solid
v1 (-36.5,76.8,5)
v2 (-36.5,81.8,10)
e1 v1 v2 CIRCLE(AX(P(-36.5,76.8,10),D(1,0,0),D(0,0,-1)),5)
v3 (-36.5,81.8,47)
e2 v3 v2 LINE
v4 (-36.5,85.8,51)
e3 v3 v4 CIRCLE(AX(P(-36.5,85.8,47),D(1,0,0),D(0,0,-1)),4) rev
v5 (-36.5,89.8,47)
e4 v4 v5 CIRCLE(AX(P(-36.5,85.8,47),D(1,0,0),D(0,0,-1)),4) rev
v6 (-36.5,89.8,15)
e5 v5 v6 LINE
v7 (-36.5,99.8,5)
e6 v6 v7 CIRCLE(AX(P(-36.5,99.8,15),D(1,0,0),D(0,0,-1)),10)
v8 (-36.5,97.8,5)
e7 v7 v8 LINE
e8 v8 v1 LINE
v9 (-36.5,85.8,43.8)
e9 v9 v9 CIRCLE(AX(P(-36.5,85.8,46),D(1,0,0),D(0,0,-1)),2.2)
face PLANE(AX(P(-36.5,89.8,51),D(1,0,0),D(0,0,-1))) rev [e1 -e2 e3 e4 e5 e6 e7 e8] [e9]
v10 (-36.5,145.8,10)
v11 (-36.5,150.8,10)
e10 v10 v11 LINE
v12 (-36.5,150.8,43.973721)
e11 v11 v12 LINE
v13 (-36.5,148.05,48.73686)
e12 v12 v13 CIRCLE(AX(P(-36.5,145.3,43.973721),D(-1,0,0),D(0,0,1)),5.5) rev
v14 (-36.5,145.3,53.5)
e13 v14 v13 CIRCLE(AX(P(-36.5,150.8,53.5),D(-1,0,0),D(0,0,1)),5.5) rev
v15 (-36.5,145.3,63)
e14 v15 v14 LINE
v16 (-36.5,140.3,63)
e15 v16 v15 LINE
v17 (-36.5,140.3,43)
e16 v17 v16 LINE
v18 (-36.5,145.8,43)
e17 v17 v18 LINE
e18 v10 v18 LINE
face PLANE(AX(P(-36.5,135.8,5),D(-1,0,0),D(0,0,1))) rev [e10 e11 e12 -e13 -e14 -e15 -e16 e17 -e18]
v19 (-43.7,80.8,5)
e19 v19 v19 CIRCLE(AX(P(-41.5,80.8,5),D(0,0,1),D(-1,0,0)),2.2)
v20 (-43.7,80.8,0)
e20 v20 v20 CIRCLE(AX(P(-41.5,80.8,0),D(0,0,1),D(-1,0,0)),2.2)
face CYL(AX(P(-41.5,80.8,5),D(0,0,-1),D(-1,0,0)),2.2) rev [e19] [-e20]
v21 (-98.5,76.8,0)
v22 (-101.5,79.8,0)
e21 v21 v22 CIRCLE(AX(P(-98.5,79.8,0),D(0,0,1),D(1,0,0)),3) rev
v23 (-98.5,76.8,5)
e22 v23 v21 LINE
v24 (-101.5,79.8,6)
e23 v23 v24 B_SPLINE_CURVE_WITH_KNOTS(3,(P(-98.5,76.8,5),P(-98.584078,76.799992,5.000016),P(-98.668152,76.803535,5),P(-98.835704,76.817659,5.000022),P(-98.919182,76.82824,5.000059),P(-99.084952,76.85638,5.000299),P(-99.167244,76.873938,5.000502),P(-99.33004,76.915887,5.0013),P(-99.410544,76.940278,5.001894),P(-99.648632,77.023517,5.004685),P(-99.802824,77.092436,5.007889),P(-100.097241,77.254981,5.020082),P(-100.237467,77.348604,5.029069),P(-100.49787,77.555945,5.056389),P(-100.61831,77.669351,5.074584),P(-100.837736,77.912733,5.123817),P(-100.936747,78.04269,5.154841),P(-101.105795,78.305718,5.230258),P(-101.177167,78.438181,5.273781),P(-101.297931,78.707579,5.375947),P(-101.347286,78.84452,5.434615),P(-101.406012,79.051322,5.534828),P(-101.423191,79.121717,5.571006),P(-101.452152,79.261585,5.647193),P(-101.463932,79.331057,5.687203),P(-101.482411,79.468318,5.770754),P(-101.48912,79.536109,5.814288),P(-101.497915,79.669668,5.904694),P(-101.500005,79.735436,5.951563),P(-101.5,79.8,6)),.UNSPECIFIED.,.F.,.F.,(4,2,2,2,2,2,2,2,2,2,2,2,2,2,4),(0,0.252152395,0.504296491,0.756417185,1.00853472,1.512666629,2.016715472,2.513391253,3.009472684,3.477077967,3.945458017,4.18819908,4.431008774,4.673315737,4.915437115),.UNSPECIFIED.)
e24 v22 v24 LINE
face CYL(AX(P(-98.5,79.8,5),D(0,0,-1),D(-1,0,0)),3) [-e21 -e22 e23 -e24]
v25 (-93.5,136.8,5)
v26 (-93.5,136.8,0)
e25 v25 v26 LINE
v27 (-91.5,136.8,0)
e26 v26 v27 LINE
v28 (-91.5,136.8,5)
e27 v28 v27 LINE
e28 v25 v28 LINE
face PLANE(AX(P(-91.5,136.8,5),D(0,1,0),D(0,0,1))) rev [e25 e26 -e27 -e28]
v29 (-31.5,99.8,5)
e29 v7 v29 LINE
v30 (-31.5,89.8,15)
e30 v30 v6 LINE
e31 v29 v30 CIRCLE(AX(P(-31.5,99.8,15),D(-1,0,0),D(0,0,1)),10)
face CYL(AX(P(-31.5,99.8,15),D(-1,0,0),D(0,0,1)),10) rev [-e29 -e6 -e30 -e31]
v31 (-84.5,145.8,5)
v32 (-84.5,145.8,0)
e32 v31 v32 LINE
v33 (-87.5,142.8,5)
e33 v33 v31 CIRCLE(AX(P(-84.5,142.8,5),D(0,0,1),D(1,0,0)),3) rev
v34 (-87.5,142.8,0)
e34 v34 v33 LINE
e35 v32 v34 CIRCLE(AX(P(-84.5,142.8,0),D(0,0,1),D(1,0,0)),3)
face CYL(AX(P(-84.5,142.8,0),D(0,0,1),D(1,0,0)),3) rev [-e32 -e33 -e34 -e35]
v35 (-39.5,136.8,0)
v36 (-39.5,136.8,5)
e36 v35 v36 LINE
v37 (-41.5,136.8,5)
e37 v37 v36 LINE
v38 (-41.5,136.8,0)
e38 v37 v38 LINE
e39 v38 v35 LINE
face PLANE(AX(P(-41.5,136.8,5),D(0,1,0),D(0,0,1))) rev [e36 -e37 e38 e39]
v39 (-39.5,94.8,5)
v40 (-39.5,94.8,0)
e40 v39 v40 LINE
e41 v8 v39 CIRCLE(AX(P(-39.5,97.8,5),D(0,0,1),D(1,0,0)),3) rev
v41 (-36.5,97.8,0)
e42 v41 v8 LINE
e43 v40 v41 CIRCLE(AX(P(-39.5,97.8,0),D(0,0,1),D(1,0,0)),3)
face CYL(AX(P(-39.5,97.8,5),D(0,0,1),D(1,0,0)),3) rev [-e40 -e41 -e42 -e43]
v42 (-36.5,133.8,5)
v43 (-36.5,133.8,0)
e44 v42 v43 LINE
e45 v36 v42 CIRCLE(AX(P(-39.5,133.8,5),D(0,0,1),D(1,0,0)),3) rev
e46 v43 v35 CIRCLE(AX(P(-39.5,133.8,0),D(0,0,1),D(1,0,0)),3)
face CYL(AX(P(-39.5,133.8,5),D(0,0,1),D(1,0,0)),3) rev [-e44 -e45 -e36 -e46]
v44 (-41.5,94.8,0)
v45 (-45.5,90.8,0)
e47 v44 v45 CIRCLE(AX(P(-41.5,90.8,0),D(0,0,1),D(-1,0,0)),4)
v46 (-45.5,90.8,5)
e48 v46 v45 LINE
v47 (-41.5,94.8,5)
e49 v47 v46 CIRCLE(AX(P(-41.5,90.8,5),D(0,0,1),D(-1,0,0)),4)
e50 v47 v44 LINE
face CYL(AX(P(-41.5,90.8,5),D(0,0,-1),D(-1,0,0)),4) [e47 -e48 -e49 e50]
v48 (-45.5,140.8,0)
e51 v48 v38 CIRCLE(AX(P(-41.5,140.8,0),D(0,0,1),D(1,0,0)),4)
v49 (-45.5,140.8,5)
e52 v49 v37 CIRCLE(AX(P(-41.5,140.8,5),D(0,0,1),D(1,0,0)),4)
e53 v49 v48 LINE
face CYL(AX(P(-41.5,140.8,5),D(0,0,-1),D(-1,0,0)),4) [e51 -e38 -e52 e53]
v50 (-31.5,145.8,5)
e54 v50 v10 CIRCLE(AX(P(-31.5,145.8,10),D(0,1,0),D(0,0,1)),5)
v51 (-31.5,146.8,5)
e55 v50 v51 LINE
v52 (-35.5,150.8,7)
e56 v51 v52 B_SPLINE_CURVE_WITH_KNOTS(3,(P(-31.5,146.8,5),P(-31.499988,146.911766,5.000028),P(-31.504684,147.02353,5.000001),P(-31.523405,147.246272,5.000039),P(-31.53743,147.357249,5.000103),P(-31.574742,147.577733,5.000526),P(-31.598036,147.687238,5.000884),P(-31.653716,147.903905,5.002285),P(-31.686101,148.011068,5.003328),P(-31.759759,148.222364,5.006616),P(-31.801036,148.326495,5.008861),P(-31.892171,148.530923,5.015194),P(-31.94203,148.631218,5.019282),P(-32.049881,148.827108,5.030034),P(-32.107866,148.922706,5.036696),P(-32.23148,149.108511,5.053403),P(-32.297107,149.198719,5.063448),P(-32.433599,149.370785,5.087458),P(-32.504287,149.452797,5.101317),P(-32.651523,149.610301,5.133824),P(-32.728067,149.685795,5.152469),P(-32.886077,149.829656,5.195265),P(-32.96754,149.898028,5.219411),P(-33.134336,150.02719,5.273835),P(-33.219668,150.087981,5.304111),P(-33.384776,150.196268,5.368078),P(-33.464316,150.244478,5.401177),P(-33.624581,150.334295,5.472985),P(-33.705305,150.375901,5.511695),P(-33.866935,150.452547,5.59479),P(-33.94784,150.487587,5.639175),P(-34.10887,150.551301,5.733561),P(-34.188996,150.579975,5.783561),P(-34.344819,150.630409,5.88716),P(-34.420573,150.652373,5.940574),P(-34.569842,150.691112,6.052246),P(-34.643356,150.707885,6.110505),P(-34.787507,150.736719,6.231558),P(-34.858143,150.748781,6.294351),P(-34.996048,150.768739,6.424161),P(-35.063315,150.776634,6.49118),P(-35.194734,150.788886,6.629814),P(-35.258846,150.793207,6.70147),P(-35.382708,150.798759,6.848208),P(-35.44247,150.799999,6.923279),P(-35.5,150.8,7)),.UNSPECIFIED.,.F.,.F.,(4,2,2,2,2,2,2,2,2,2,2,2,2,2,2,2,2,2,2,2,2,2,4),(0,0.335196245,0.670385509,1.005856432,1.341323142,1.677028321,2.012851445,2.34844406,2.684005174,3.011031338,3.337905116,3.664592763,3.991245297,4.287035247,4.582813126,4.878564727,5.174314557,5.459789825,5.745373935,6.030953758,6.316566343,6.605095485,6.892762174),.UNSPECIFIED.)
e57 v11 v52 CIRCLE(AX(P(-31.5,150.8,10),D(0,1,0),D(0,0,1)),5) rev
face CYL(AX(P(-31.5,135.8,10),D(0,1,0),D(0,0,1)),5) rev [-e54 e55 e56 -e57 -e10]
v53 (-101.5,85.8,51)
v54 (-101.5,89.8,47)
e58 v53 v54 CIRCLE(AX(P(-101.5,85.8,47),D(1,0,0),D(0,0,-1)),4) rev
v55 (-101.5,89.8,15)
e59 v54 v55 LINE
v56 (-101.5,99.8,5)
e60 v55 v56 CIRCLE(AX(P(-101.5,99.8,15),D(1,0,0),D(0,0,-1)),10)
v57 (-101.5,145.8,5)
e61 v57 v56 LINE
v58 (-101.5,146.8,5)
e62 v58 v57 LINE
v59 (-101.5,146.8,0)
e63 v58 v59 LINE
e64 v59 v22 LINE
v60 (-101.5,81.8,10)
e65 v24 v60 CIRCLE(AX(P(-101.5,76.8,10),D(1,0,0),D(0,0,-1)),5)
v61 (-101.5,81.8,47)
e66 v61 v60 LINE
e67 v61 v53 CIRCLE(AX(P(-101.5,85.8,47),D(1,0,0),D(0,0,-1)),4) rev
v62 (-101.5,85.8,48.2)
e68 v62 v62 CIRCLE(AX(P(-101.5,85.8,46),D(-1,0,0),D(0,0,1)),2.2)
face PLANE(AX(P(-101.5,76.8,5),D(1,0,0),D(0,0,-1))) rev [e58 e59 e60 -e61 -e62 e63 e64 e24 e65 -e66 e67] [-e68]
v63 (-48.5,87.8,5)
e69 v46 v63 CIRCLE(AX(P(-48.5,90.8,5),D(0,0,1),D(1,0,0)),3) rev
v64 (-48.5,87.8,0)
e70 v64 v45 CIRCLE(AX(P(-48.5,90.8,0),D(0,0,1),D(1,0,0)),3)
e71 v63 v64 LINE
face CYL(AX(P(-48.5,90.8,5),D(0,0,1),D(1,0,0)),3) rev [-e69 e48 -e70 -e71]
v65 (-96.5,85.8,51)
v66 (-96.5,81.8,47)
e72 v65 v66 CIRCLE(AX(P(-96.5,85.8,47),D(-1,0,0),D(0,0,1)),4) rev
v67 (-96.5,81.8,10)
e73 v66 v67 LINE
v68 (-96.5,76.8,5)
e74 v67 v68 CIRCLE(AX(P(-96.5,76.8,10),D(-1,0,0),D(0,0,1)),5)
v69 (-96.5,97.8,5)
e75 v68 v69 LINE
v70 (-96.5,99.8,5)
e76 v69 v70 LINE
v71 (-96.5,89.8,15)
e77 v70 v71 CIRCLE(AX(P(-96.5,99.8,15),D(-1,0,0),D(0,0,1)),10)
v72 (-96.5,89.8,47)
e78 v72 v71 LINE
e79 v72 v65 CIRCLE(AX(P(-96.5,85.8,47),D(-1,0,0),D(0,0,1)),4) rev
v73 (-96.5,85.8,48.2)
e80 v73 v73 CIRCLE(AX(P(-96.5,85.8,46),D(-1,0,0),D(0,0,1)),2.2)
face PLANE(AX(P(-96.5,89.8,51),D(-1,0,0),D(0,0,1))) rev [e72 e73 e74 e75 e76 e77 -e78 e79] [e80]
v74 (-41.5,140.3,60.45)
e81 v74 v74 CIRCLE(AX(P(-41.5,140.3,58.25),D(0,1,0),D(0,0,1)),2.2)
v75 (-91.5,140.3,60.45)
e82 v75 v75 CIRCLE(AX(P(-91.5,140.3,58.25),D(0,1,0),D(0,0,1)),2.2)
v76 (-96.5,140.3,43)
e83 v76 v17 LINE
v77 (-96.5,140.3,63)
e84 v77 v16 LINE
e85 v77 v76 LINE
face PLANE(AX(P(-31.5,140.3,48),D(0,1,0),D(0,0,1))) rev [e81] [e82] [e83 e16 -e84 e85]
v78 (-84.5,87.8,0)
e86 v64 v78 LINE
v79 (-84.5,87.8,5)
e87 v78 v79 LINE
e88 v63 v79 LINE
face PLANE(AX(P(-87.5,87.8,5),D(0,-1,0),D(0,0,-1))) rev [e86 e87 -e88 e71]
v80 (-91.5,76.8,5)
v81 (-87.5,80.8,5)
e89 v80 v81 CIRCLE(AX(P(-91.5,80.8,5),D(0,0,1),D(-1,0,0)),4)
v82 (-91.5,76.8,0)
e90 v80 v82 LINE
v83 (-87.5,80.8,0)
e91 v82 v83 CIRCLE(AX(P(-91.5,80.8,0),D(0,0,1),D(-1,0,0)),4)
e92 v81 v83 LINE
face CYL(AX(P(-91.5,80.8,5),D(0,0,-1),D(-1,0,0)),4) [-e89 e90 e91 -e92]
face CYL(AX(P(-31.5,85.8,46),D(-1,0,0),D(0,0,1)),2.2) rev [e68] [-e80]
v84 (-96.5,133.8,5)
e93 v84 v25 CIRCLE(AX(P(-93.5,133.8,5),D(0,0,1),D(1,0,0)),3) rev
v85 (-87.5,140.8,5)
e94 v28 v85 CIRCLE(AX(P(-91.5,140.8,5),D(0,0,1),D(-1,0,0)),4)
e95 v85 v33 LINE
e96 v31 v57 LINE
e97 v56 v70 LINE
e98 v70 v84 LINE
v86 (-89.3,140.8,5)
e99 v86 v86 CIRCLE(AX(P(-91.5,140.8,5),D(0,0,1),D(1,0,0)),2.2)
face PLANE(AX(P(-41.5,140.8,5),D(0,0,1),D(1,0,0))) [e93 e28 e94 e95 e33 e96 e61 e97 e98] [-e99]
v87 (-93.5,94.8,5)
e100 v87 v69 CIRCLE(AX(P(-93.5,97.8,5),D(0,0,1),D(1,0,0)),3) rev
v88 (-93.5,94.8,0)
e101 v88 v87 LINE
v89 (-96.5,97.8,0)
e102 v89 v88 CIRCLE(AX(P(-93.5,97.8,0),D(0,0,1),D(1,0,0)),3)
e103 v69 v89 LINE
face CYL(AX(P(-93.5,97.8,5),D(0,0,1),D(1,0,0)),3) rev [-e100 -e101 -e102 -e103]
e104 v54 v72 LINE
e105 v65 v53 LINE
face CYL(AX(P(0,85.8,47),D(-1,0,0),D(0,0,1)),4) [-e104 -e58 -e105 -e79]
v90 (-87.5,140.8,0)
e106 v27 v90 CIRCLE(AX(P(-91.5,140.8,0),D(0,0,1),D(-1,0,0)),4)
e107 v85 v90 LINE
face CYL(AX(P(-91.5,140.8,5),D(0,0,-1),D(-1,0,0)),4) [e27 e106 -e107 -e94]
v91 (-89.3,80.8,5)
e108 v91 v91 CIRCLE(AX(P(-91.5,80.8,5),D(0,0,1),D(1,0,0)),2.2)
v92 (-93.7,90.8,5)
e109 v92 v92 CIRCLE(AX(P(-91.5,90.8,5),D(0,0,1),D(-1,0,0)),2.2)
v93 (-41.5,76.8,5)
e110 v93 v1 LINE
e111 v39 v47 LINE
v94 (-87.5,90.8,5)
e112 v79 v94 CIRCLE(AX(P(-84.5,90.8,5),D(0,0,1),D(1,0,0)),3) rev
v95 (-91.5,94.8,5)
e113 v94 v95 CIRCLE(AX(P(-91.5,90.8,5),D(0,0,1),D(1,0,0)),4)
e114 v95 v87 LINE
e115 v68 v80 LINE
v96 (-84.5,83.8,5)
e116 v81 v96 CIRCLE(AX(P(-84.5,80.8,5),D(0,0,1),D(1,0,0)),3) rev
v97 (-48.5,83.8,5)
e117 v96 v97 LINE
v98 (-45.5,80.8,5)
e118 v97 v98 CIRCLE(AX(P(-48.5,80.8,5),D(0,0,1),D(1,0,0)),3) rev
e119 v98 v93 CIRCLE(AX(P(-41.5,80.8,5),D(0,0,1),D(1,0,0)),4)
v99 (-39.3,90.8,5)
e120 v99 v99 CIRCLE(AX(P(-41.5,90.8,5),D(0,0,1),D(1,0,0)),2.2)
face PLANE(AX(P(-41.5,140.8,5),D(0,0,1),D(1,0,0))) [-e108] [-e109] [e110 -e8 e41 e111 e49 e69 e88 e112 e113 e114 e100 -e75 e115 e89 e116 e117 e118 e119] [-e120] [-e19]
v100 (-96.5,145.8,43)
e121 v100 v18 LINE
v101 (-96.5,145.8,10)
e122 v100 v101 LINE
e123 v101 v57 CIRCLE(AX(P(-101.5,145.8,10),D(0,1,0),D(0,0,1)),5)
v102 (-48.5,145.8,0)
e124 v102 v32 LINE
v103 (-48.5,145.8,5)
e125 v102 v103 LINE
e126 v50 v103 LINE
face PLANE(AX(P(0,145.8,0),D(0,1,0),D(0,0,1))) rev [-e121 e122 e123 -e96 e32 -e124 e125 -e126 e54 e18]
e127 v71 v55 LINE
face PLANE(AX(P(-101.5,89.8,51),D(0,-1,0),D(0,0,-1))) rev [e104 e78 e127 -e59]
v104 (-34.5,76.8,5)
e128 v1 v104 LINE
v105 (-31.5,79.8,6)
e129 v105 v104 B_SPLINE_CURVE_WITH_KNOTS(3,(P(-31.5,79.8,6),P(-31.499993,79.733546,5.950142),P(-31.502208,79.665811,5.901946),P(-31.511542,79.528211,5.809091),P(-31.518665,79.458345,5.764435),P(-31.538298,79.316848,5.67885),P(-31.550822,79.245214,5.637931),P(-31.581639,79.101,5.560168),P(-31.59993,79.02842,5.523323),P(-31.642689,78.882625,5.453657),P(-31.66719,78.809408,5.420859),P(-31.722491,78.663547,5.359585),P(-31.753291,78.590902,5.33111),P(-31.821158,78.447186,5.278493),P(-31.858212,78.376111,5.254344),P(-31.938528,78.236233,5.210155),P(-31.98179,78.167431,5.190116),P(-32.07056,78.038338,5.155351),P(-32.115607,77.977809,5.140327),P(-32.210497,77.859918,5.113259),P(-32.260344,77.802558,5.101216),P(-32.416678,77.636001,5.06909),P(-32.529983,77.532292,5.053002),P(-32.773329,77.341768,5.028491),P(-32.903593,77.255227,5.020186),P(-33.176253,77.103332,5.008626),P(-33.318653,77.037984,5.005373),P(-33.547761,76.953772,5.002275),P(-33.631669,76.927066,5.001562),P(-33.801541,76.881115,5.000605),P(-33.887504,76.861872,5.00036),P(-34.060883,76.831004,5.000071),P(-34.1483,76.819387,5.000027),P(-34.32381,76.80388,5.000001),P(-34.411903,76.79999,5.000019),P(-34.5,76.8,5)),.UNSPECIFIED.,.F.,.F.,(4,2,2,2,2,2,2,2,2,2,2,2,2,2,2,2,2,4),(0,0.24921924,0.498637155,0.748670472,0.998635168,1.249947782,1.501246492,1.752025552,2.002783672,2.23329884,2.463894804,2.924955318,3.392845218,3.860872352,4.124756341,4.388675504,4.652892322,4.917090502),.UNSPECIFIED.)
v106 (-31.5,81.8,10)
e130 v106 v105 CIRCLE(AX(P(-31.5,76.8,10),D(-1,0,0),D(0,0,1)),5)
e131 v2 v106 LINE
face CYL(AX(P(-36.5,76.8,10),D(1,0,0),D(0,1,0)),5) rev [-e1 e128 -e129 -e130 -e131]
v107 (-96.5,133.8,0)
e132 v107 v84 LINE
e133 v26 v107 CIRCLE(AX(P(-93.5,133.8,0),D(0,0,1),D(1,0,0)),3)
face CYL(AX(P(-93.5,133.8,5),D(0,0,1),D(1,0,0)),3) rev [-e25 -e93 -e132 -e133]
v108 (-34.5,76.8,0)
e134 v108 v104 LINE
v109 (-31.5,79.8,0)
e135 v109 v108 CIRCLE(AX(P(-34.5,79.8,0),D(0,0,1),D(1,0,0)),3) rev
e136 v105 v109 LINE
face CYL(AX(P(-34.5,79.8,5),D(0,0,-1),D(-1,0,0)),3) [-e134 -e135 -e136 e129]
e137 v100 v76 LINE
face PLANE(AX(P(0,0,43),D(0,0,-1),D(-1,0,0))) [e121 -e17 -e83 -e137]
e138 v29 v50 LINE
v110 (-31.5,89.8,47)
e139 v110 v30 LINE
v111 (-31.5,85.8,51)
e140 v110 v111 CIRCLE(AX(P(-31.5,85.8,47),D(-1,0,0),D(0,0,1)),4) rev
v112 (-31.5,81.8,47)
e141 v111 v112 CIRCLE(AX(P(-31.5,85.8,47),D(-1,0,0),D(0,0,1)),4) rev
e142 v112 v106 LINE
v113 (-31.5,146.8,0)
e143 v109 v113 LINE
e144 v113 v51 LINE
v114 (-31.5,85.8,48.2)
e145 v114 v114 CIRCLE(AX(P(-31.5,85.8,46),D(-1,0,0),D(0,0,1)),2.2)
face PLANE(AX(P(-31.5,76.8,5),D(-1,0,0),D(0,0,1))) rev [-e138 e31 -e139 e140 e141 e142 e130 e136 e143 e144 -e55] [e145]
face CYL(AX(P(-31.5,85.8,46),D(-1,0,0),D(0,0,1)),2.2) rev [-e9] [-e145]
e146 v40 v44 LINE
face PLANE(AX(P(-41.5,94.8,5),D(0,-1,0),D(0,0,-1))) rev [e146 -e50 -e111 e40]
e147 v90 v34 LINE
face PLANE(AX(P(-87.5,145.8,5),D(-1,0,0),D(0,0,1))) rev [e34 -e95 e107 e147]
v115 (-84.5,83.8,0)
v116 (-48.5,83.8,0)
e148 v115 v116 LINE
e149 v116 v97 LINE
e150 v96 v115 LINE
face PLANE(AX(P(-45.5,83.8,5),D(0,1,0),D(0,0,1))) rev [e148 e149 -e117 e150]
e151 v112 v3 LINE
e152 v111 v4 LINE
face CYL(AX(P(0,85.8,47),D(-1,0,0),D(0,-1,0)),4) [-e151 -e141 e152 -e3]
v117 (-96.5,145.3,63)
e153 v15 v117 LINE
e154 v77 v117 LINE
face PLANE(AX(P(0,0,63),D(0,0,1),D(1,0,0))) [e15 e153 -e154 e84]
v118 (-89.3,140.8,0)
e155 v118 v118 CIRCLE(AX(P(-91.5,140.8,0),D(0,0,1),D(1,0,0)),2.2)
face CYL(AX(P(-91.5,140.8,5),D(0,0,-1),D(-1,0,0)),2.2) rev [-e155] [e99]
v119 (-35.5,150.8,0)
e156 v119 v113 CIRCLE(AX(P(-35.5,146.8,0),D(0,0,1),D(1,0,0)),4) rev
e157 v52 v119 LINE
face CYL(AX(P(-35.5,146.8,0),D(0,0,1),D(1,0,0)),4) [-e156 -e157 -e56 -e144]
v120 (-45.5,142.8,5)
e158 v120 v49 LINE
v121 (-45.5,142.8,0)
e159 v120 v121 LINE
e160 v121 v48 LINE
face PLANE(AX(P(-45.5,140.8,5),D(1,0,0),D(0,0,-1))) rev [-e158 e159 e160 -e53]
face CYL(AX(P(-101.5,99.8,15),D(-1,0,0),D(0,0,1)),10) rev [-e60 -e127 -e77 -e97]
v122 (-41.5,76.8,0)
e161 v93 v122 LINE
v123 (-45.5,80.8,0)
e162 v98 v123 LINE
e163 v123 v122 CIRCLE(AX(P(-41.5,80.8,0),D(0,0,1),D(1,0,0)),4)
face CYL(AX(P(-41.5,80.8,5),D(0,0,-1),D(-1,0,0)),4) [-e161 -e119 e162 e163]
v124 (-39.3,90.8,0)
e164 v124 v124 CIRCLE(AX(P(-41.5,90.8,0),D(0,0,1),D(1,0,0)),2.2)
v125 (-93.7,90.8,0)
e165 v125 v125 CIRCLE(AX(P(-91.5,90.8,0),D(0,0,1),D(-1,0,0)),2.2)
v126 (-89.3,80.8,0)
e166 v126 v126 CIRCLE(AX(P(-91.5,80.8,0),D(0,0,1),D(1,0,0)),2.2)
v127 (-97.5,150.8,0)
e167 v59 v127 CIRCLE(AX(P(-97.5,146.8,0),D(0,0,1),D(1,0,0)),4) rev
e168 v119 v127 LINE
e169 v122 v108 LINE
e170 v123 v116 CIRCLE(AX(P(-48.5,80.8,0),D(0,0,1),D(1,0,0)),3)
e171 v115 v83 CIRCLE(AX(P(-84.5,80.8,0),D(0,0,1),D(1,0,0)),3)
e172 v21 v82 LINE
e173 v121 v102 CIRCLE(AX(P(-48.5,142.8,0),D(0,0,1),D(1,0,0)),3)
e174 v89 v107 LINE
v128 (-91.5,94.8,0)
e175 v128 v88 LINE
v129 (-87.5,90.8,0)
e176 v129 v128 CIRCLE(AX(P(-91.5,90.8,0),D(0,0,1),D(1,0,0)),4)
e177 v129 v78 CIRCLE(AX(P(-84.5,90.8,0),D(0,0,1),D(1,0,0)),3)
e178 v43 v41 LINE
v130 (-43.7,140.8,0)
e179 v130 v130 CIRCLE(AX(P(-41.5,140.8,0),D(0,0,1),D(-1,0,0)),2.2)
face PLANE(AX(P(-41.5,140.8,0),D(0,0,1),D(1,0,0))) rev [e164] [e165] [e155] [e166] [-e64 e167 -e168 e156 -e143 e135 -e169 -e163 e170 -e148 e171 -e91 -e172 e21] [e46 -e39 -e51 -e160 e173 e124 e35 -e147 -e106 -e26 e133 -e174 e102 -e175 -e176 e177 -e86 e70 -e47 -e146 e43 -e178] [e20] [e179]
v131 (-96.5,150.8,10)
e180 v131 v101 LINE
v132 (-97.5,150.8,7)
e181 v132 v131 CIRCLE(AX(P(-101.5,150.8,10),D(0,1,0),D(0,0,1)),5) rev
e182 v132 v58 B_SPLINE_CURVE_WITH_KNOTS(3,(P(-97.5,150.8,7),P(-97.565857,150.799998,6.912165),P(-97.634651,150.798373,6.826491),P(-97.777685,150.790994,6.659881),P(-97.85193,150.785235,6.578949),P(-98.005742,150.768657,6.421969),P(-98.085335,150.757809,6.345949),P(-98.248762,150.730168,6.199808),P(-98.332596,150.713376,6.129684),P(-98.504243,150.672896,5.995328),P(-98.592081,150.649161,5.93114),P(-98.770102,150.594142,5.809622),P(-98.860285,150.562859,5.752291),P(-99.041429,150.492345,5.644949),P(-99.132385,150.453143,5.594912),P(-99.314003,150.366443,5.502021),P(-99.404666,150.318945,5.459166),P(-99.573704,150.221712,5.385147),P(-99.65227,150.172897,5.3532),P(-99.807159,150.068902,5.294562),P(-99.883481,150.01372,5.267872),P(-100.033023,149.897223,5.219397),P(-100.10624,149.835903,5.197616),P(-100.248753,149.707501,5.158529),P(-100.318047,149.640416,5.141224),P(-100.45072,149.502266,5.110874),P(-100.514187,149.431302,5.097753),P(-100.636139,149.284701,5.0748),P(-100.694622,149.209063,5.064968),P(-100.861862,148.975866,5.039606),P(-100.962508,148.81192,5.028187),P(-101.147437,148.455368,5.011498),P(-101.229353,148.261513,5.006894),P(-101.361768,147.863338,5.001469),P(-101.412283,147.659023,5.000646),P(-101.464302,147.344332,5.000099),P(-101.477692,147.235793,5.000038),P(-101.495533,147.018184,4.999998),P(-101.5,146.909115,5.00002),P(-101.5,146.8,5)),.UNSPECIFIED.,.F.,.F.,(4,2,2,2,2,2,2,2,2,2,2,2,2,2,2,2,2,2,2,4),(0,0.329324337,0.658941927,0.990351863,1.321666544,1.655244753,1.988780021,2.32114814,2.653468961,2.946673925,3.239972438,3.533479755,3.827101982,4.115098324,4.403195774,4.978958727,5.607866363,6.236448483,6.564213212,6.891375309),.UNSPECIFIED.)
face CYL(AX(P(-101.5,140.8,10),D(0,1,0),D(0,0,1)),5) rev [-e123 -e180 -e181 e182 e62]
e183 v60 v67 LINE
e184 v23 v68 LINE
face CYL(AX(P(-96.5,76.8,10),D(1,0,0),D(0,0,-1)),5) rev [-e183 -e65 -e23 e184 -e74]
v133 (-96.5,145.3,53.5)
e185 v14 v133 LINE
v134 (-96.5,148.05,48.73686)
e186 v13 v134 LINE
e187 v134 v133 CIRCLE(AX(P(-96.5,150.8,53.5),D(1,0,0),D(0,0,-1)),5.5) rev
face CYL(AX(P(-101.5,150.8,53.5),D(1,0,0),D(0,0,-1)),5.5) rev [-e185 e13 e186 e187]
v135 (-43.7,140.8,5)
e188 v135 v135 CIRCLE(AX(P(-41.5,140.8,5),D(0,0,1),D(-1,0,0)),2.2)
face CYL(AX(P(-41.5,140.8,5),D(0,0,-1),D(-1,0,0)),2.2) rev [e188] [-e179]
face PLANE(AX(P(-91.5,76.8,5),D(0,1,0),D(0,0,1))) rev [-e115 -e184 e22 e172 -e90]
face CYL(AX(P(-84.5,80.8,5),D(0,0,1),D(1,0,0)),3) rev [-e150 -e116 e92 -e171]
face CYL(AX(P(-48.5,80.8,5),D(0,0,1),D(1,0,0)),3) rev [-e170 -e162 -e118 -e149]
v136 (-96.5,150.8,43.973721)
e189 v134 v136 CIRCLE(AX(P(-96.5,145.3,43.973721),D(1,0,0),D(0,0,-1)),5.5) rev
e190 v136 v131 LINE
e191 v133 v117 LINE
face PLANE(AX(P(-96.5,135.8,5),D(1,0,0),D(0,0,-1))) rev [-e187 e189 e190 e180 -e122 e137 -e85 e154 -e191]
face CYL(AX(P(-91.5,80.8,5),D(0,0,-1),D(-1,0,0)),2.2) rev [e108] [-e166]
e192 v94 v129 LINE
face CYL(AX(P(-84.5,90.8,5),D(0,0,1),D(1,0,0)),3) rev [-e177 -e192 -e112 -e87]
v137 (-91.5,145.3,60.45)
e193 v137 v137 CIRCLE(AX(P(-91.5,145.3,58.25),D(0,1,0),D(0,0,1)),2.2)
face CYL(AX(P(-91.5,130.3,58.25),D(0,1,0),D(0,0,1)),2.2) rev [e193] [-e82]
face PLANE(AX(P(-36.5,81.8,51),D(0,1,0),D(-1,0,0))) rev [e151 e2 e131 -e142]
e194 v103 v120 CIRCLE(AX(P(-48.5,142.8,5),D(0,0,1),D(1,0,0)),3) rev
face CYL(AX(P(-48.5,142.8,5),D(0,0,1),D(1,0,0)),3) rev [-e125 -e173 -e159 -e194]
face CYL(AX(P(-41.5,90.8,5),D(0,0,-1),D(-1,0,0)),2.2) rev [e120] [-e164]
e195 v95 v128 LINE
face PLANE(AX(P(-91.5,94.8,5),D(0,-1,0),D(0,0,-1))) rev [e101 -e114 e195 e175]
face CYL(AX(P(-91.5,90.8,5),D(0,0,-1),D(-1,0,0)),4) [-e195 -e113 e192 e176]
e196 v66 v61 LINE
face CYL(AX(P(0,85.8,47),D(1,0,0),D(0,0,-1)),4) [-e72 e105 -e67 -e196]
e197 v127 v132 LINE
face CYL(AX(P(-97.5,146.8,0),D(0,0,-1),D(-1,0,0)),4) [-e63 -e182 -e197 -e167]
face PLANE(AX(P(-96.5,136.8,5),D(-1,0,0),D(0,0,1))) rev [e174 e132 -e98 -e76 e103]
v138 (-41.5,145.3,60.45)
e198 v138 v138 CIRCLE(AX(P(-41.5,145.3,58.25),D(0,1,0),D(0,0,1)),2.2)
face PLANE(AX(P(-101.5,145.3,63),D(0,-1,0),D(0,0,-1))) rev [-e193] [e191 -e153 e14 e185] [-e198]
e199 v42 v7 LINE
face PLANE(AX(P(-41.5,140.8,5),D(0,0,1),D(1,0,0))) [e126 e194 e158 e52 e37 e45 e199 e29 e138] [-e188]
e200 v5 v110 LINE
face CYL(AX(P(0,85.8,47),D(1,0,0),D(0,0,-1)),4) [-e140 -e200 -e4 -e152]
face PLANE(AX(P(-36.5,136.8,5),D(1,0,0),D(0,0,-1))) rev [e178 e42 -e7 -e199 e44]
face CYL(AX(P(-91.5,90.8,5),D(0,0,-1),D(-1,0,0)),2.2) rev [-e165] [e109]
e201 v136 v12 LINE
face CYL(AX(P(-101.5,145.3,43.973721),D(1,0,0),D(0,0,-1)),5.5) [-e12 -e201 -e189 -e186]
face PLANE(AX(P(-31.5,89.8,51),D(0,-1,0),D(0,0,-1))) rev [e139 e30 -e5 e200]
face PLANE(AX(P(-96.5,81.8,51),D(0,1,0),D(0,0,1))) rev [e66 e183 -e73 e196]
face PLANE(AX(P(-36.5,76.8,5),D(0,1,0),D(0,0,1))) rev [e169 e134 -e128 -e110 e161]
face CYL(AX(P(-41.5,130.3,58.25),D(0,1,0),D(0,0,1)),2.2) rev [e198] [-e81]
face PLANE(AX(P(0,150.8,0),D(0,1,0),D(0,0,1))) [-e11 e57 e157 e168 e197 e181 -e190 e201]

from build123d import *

# Parameters (mm, degrees)
SKETCH1_R           = 2.2
BOSS_EXTRUDE1_DEPTH = 5
FILLET1_R           = 3
FILLET2_R           = 3
SKETCH2_W           = 70
SKETCH2_H           = 43
BOSS_EXTRUDE2_DEPTH = 5
SKETCH3_W           = 70
SKETCH3_H           = 10.5
BOSS_EXTRUDE3_DEPTH = 5
SKETCH4_W           = 70
SKETCH4_H           = 5
BOSS_EXTRUDE4_DEPTH = 15
FILLET3_R           = 5.5
SKETCH6_W           = 5
SKETCH6_H           = 58
CUT_EXTRUDE1_DEPTH  = 15
FILLET4_R           = 5.5
FILLET5_R           = 5
SKETCH7_R           = 2.2
CUT_EXTRUDE2_DEPTH  = 15
SKETCH8_W           = 5
SKETCH8_H           = 8
BOSS_EXTRUDE5_DEPTH = 46
FILLET7_R           = 10
FILLET8_R           = 3
FILLET9_R           = 5
SKETCH10_R          = 2.2
CUT_EXTRUDE3_DEPTH  = 178.791001057
FILLET10_R          = 4
FILLET11_R          = 4
FILLET12_R          = 4


# Some blends are built 0.0001 mm under size
with BuildPart() as part:
    # Sketch1 → Boss-Extrude1 (new body)
    with BuildSketch(Plane.XY):
        with BuildLine():
            Line((-45.5, 87.8), (-45.5, 90.8))
            ThreePointArc((-45.5, 90.8), (-44.328427125, 93.628427125), (-41.5, 94.8))
            Line((-41.5, 94.8), (-36.5, 94.8))
            Line((-36.5, 94.8), (-36.5, 136.8))
            Line((-36.5, 136.8), (-41.5, 136.8))
            ThreePointArc((-41.5, 136.8), (-44.328427125, 137.971572875), (-45.5, 140.8))
            Line((-45.5, 140.8), (-45.5, 145.8))
            Line((-45.5, 145.8), (-36.5, 145.8))
            Line((-36.5, 145.8), (-31.5, 145.8))
            Line((-31.5, 145.8), (-31.5, 76.8))
            Line((-31.5, 76.8), (-36.5, 76.8))
            Line((-36.5, 76.8), (-41.5, 76.8))
            ThreePointArc((-41.5, 76.8), (-44.328427125, 77.971572875), (-45.5, 80.8))
            Line((-45.5, 80.8), (-45.5, 83.8))
            Line((-45.5, 83.8), (-87.5, 83.8))
            Line((-87.5, 83.8), (-87.5, 80.8))
            ThreePointArc((-87.5, 80.8), (-88.671572875, 77.971572875), (-91.5, 76.8))
            Line((-91.5, 76.8), (-96.5, 76.8))
            Line((-96.5, 76.8), (-101.5, 76.8))
            Line((-101.5, 76.8), (-101.5, 145.8))
            Line((-101.5, 145.8), (-96.5, 145.8))
            Line((-96.5, 145.8), (-87.5, 145.8))
            Line((-87.5, 145.8), (-87.5, 140.8))
            ThreePointArc((-87.5, 140.8), (-88.671572875, 137.971572875), (-91.5, 136.8))
            Line((-91.5, 136.8), (-96.5, 136.8))
            Line((-96.5, 136.8), (-96.5, 94.8))
            Line((-96.5, 94.8), (-91.5, 94.8))
            ThreePointArc((-91.5, 94.8), (-88.671572875, 93.628427125), (-87.5, 90.8))
            Line((-87.5, 90.8), (-87.5, 87.8))
            Line((-87.5, 87.8), (-45.5, 87.8))
        make_face()
        with Locations((-91.5, 140.8)):
            Circle(SKETCH1_R, mode=Mode.SUBTRACT)
        with Locations(Location((-41.5, 140.8, 0), (0, 0, 180))):
            Circle(SKETCH1_R, mode=Mode.SUBTRACT)
        with Locations((-41.5, 90.8)):
            Circle(SKETCH1_R, mode=Mode.SUBTRACT)
        with Locations(Location((-91.5, 90.8, 0), (0, 0, 180))):
            Circle(SKETCH1_R, mode=Mode.SUBTRACT)
        with Locations((-91.5, 80.8)):
            Circle(SKETCH1_R, mode=Mode.SUBTRACT)
        with Locations(Location((-41.5, 80.8, 0), (0, 0, 180))):
            Circle(SKETCH1_R, mode=Mode.SUBTRACT)
    extrude(amount=BOSS_EXTRUDE1_DEPTH)

    # Fillet1
    fillet1_edges = [part.edges().sort_by_distance(p)[0] for p in [
        (-36.5, 136.8, 2.5),
        (-96.5, 136.8, 2.5),
        (-36.5, 94.8, 2.5),
        (-45.5, 87.8, 2.5),
        (-45.5, 83.8, 2.5),
        (-87.5, 83.8, 2.5),
        (-87.5, 87.8, 2.5),
        (-96.5, 94.8, 2.5),
    ]]
    fillet(fillet1_edges, radius=FILLET1_R - 0.0001)  # a hair under: the kernel refuses the full size

    # Fillet2
    fillet2_edges = [part.edges().sort_by_distance(p)[0] for p in [
        (-31.5, 76.8, 2.5),
        (-101.5, 76.8, 2.5),
    ]]
    fillet(fillet2_edges, radius=FILLET2_R)

    # Sketch2 → Boss-Extrude2 (add)
    with BuildSketch(Plane(origin=(0, 145.8, 0), x_dir=(1, 0, 0), z_dir=(0, 1, 0))):
        with Locations((-66.5, -21.5)):
            Rectangle(SKETCH2_W, SKETCH2_H)
    extrude(amount=BOSS_EXTRUDE2_DEPTH)

    # Sketch3 → Boss-Extrude3 (add)
    with BuildSketch(Plane.XY.offset(43)):
        with Locations((-66.5, 145.55)):
            Rectangle(SKETCH3_W, SKETCH3_H)
    extrude(amount=BOSS_EXTRUDE3_DEPTH)

    # Sketch4 → Boss-Extrude4 (add)
    with BuildSketch(Plane.XY.offset(48)):
        with Locations((-66.5, 142.8)):
            Rectangle(SKETCH4_W, SKETCH4_H)
    extrude(amount=BOSS_EXTRUDE4_DEPTH)

    # Fillet3
    fillet3_edges = [part.edges().sort_by_distance(p)[0] for p in [
        (-66.5, 145.3, 48),
    ]]
    fillet(fillet3_edges, radius=FILLET3_R - 0.0001)  # a hair under: the kernel refuses the full size

    # Sketch6 → Cut-Extrude1 (cut)
    with BuildSketch(Plane(origin=(0, 150.8, 0), x_dir=(1, 0, 0), z_dir=(0, 1, 0))):
        with Locations((-99, -34)):
            Rectangle(SKETCH6_W, SKETCH6_H)
        with Locations((-34, -34)):
            Rectangle(SKETCH6_W, SKETCH6_H)
    extrude(amount=-CUT_EXTRUDE1_DEPTH, mode=Mode.SUBTRACT)

    # Fillet4
    fillet4_edges = [part.edges().sort_by_distance(p)[0] for p in [
        (-66.5, 150.8, 48),
    ]]
    fillet(fillet4_edges, radius=FILLET4_R)

    # Fillet5
    fillet5_edges = [part.edges().sort_by_distance(p)[0] for p in [
        (-36.5, 148.3, 5),
        (-96.5, 148.3, 5),
    ]]
    fillet(fillet5_edges, radius=FILLET5_R - 0.0001)  # a hair under: the kernel refuses the full size

    # Sketch7 → Cut-Extrude2 (cut)
    with BuildSketch(Plane(origin=(0, 145.3, 0), x_dir=(1, 0, 0), z_dir=(0, 1, 0))):
        with Locations(Location((-91.5, -58.25, 0), (0, 0, 270))):
            Circle(SKETCH7_R)
        with Locations(Location((-41.5, -58.25, 0), (0, 0, 270))):
            Circle(SKETCH7_R)
    extrude(amount=-CUT_EXTRUDE2_DEPTH, mode=Mode.SUBTRACT)

    # Sketch8 → Boss-Extrude5 (add)
    with BuildSketch(Plane.XY.offset(5)):
        with Locations((-99, 85.8)):
            Rectangle(SKETCH8_W, SKETCH8_H)
        with Locations((-34, 85.8)):
            Rectangle(SKETCH8_W, SKETCH8_H)
    extrude(amount=BOSS_EXTRUDE5_DEPTH)

    # Fillet7
    # the kernel refuses this fillet: 10 mm, written as the material it adds along each edge
    with BuildSketch(Plane(origin=(-101.5, 89.8, 5), x_dir=(0, 1, 0), z_dir=(1, 0, 0))) as fillet7_piece_1:
        with BuildLine():
            CenterArc((FILLET7_R, FILLET7_R), FILLET7_R, 180, 90)
            Line((0, FILLET7_R), (0, 0))
            Line((0, 0), (FILLET7_R, 0))
        make_face()
    extrude(amount=5)
    with BuildSketch(Plane(origin=(-31.5, 89.8, 5), x_dir=(0, 1, 0), z_dir=(-1, 0, 0))) as fillet7_piece_2:
        with BuildLine():
            CenterArc((FILLET7_R, -FILLET7_R), FILLET7_R, 90, 90)
            Line((0, -FILLET7_R), (0, 0))
            Line((0, 0), (FILLET7_R, 0))
        make_face()
    extrude(amount=5)

    # Fillet8
    fillet8_edges = [part.edges().sort_by_distance(p)[0] for p in [
        (-87.5, 145.8, 2.5),
        (-45.5, 145.8, 2.5),
    ]]
    fillet(fillet8_edges, radius=FILLET8_R)

    # Fillet9
    fillet9_edges = [part.edges().sort_by_distance(p)[0] for p in [
        (-34, 81.8, 5),
        (-99, 81.8, 5),
    ]]
    fillet(fillet9_edges, radius=FILLET9_R - 0.0001)  # a hair under: the kernel refuses the full size

    # Sketch10 → Cut-Extrude3 (cut, through all)
    with BuildSketch(Plane.ZY.offset(101.5)):
        with Locations((46, 85.8)):
            Circle(SKETCH10_R)
    extrude(amount=-CUT_EXTRUDE3_DEPTH, mode=Mode.SUBTRACT)

    # Fillet10
    fillet10_edges = [part.edges().sort_by_distance(p)[0] for p in [
        (-99, 81.8, 51),
        (-99, 89.8, 51),
        (-34, 81.8, 51),
        (-34, 89.8, 51),
    ]]
    fillet(fillet10_edges, radius=FILLET10_R - 0.0001)  # a hair under: the kernel refuses the full size

    # Fillet11
    fillet11_edges = [part.edges().sort_by_distance(p)[0] for p in [
        (-101.5, 150.8, 2.5),
    ]]
    fillet(fillet11_edges, radius=FILLET11_R)

    # Fillet12
    fillet12_edges = [part.edges().sort_by_distance(p)[0] for p in [
        (-31.5, 150.8, 2.5),
    ]]
    fillet(fillet12_edges, radius=FILLET12_R)


solid = part.part
